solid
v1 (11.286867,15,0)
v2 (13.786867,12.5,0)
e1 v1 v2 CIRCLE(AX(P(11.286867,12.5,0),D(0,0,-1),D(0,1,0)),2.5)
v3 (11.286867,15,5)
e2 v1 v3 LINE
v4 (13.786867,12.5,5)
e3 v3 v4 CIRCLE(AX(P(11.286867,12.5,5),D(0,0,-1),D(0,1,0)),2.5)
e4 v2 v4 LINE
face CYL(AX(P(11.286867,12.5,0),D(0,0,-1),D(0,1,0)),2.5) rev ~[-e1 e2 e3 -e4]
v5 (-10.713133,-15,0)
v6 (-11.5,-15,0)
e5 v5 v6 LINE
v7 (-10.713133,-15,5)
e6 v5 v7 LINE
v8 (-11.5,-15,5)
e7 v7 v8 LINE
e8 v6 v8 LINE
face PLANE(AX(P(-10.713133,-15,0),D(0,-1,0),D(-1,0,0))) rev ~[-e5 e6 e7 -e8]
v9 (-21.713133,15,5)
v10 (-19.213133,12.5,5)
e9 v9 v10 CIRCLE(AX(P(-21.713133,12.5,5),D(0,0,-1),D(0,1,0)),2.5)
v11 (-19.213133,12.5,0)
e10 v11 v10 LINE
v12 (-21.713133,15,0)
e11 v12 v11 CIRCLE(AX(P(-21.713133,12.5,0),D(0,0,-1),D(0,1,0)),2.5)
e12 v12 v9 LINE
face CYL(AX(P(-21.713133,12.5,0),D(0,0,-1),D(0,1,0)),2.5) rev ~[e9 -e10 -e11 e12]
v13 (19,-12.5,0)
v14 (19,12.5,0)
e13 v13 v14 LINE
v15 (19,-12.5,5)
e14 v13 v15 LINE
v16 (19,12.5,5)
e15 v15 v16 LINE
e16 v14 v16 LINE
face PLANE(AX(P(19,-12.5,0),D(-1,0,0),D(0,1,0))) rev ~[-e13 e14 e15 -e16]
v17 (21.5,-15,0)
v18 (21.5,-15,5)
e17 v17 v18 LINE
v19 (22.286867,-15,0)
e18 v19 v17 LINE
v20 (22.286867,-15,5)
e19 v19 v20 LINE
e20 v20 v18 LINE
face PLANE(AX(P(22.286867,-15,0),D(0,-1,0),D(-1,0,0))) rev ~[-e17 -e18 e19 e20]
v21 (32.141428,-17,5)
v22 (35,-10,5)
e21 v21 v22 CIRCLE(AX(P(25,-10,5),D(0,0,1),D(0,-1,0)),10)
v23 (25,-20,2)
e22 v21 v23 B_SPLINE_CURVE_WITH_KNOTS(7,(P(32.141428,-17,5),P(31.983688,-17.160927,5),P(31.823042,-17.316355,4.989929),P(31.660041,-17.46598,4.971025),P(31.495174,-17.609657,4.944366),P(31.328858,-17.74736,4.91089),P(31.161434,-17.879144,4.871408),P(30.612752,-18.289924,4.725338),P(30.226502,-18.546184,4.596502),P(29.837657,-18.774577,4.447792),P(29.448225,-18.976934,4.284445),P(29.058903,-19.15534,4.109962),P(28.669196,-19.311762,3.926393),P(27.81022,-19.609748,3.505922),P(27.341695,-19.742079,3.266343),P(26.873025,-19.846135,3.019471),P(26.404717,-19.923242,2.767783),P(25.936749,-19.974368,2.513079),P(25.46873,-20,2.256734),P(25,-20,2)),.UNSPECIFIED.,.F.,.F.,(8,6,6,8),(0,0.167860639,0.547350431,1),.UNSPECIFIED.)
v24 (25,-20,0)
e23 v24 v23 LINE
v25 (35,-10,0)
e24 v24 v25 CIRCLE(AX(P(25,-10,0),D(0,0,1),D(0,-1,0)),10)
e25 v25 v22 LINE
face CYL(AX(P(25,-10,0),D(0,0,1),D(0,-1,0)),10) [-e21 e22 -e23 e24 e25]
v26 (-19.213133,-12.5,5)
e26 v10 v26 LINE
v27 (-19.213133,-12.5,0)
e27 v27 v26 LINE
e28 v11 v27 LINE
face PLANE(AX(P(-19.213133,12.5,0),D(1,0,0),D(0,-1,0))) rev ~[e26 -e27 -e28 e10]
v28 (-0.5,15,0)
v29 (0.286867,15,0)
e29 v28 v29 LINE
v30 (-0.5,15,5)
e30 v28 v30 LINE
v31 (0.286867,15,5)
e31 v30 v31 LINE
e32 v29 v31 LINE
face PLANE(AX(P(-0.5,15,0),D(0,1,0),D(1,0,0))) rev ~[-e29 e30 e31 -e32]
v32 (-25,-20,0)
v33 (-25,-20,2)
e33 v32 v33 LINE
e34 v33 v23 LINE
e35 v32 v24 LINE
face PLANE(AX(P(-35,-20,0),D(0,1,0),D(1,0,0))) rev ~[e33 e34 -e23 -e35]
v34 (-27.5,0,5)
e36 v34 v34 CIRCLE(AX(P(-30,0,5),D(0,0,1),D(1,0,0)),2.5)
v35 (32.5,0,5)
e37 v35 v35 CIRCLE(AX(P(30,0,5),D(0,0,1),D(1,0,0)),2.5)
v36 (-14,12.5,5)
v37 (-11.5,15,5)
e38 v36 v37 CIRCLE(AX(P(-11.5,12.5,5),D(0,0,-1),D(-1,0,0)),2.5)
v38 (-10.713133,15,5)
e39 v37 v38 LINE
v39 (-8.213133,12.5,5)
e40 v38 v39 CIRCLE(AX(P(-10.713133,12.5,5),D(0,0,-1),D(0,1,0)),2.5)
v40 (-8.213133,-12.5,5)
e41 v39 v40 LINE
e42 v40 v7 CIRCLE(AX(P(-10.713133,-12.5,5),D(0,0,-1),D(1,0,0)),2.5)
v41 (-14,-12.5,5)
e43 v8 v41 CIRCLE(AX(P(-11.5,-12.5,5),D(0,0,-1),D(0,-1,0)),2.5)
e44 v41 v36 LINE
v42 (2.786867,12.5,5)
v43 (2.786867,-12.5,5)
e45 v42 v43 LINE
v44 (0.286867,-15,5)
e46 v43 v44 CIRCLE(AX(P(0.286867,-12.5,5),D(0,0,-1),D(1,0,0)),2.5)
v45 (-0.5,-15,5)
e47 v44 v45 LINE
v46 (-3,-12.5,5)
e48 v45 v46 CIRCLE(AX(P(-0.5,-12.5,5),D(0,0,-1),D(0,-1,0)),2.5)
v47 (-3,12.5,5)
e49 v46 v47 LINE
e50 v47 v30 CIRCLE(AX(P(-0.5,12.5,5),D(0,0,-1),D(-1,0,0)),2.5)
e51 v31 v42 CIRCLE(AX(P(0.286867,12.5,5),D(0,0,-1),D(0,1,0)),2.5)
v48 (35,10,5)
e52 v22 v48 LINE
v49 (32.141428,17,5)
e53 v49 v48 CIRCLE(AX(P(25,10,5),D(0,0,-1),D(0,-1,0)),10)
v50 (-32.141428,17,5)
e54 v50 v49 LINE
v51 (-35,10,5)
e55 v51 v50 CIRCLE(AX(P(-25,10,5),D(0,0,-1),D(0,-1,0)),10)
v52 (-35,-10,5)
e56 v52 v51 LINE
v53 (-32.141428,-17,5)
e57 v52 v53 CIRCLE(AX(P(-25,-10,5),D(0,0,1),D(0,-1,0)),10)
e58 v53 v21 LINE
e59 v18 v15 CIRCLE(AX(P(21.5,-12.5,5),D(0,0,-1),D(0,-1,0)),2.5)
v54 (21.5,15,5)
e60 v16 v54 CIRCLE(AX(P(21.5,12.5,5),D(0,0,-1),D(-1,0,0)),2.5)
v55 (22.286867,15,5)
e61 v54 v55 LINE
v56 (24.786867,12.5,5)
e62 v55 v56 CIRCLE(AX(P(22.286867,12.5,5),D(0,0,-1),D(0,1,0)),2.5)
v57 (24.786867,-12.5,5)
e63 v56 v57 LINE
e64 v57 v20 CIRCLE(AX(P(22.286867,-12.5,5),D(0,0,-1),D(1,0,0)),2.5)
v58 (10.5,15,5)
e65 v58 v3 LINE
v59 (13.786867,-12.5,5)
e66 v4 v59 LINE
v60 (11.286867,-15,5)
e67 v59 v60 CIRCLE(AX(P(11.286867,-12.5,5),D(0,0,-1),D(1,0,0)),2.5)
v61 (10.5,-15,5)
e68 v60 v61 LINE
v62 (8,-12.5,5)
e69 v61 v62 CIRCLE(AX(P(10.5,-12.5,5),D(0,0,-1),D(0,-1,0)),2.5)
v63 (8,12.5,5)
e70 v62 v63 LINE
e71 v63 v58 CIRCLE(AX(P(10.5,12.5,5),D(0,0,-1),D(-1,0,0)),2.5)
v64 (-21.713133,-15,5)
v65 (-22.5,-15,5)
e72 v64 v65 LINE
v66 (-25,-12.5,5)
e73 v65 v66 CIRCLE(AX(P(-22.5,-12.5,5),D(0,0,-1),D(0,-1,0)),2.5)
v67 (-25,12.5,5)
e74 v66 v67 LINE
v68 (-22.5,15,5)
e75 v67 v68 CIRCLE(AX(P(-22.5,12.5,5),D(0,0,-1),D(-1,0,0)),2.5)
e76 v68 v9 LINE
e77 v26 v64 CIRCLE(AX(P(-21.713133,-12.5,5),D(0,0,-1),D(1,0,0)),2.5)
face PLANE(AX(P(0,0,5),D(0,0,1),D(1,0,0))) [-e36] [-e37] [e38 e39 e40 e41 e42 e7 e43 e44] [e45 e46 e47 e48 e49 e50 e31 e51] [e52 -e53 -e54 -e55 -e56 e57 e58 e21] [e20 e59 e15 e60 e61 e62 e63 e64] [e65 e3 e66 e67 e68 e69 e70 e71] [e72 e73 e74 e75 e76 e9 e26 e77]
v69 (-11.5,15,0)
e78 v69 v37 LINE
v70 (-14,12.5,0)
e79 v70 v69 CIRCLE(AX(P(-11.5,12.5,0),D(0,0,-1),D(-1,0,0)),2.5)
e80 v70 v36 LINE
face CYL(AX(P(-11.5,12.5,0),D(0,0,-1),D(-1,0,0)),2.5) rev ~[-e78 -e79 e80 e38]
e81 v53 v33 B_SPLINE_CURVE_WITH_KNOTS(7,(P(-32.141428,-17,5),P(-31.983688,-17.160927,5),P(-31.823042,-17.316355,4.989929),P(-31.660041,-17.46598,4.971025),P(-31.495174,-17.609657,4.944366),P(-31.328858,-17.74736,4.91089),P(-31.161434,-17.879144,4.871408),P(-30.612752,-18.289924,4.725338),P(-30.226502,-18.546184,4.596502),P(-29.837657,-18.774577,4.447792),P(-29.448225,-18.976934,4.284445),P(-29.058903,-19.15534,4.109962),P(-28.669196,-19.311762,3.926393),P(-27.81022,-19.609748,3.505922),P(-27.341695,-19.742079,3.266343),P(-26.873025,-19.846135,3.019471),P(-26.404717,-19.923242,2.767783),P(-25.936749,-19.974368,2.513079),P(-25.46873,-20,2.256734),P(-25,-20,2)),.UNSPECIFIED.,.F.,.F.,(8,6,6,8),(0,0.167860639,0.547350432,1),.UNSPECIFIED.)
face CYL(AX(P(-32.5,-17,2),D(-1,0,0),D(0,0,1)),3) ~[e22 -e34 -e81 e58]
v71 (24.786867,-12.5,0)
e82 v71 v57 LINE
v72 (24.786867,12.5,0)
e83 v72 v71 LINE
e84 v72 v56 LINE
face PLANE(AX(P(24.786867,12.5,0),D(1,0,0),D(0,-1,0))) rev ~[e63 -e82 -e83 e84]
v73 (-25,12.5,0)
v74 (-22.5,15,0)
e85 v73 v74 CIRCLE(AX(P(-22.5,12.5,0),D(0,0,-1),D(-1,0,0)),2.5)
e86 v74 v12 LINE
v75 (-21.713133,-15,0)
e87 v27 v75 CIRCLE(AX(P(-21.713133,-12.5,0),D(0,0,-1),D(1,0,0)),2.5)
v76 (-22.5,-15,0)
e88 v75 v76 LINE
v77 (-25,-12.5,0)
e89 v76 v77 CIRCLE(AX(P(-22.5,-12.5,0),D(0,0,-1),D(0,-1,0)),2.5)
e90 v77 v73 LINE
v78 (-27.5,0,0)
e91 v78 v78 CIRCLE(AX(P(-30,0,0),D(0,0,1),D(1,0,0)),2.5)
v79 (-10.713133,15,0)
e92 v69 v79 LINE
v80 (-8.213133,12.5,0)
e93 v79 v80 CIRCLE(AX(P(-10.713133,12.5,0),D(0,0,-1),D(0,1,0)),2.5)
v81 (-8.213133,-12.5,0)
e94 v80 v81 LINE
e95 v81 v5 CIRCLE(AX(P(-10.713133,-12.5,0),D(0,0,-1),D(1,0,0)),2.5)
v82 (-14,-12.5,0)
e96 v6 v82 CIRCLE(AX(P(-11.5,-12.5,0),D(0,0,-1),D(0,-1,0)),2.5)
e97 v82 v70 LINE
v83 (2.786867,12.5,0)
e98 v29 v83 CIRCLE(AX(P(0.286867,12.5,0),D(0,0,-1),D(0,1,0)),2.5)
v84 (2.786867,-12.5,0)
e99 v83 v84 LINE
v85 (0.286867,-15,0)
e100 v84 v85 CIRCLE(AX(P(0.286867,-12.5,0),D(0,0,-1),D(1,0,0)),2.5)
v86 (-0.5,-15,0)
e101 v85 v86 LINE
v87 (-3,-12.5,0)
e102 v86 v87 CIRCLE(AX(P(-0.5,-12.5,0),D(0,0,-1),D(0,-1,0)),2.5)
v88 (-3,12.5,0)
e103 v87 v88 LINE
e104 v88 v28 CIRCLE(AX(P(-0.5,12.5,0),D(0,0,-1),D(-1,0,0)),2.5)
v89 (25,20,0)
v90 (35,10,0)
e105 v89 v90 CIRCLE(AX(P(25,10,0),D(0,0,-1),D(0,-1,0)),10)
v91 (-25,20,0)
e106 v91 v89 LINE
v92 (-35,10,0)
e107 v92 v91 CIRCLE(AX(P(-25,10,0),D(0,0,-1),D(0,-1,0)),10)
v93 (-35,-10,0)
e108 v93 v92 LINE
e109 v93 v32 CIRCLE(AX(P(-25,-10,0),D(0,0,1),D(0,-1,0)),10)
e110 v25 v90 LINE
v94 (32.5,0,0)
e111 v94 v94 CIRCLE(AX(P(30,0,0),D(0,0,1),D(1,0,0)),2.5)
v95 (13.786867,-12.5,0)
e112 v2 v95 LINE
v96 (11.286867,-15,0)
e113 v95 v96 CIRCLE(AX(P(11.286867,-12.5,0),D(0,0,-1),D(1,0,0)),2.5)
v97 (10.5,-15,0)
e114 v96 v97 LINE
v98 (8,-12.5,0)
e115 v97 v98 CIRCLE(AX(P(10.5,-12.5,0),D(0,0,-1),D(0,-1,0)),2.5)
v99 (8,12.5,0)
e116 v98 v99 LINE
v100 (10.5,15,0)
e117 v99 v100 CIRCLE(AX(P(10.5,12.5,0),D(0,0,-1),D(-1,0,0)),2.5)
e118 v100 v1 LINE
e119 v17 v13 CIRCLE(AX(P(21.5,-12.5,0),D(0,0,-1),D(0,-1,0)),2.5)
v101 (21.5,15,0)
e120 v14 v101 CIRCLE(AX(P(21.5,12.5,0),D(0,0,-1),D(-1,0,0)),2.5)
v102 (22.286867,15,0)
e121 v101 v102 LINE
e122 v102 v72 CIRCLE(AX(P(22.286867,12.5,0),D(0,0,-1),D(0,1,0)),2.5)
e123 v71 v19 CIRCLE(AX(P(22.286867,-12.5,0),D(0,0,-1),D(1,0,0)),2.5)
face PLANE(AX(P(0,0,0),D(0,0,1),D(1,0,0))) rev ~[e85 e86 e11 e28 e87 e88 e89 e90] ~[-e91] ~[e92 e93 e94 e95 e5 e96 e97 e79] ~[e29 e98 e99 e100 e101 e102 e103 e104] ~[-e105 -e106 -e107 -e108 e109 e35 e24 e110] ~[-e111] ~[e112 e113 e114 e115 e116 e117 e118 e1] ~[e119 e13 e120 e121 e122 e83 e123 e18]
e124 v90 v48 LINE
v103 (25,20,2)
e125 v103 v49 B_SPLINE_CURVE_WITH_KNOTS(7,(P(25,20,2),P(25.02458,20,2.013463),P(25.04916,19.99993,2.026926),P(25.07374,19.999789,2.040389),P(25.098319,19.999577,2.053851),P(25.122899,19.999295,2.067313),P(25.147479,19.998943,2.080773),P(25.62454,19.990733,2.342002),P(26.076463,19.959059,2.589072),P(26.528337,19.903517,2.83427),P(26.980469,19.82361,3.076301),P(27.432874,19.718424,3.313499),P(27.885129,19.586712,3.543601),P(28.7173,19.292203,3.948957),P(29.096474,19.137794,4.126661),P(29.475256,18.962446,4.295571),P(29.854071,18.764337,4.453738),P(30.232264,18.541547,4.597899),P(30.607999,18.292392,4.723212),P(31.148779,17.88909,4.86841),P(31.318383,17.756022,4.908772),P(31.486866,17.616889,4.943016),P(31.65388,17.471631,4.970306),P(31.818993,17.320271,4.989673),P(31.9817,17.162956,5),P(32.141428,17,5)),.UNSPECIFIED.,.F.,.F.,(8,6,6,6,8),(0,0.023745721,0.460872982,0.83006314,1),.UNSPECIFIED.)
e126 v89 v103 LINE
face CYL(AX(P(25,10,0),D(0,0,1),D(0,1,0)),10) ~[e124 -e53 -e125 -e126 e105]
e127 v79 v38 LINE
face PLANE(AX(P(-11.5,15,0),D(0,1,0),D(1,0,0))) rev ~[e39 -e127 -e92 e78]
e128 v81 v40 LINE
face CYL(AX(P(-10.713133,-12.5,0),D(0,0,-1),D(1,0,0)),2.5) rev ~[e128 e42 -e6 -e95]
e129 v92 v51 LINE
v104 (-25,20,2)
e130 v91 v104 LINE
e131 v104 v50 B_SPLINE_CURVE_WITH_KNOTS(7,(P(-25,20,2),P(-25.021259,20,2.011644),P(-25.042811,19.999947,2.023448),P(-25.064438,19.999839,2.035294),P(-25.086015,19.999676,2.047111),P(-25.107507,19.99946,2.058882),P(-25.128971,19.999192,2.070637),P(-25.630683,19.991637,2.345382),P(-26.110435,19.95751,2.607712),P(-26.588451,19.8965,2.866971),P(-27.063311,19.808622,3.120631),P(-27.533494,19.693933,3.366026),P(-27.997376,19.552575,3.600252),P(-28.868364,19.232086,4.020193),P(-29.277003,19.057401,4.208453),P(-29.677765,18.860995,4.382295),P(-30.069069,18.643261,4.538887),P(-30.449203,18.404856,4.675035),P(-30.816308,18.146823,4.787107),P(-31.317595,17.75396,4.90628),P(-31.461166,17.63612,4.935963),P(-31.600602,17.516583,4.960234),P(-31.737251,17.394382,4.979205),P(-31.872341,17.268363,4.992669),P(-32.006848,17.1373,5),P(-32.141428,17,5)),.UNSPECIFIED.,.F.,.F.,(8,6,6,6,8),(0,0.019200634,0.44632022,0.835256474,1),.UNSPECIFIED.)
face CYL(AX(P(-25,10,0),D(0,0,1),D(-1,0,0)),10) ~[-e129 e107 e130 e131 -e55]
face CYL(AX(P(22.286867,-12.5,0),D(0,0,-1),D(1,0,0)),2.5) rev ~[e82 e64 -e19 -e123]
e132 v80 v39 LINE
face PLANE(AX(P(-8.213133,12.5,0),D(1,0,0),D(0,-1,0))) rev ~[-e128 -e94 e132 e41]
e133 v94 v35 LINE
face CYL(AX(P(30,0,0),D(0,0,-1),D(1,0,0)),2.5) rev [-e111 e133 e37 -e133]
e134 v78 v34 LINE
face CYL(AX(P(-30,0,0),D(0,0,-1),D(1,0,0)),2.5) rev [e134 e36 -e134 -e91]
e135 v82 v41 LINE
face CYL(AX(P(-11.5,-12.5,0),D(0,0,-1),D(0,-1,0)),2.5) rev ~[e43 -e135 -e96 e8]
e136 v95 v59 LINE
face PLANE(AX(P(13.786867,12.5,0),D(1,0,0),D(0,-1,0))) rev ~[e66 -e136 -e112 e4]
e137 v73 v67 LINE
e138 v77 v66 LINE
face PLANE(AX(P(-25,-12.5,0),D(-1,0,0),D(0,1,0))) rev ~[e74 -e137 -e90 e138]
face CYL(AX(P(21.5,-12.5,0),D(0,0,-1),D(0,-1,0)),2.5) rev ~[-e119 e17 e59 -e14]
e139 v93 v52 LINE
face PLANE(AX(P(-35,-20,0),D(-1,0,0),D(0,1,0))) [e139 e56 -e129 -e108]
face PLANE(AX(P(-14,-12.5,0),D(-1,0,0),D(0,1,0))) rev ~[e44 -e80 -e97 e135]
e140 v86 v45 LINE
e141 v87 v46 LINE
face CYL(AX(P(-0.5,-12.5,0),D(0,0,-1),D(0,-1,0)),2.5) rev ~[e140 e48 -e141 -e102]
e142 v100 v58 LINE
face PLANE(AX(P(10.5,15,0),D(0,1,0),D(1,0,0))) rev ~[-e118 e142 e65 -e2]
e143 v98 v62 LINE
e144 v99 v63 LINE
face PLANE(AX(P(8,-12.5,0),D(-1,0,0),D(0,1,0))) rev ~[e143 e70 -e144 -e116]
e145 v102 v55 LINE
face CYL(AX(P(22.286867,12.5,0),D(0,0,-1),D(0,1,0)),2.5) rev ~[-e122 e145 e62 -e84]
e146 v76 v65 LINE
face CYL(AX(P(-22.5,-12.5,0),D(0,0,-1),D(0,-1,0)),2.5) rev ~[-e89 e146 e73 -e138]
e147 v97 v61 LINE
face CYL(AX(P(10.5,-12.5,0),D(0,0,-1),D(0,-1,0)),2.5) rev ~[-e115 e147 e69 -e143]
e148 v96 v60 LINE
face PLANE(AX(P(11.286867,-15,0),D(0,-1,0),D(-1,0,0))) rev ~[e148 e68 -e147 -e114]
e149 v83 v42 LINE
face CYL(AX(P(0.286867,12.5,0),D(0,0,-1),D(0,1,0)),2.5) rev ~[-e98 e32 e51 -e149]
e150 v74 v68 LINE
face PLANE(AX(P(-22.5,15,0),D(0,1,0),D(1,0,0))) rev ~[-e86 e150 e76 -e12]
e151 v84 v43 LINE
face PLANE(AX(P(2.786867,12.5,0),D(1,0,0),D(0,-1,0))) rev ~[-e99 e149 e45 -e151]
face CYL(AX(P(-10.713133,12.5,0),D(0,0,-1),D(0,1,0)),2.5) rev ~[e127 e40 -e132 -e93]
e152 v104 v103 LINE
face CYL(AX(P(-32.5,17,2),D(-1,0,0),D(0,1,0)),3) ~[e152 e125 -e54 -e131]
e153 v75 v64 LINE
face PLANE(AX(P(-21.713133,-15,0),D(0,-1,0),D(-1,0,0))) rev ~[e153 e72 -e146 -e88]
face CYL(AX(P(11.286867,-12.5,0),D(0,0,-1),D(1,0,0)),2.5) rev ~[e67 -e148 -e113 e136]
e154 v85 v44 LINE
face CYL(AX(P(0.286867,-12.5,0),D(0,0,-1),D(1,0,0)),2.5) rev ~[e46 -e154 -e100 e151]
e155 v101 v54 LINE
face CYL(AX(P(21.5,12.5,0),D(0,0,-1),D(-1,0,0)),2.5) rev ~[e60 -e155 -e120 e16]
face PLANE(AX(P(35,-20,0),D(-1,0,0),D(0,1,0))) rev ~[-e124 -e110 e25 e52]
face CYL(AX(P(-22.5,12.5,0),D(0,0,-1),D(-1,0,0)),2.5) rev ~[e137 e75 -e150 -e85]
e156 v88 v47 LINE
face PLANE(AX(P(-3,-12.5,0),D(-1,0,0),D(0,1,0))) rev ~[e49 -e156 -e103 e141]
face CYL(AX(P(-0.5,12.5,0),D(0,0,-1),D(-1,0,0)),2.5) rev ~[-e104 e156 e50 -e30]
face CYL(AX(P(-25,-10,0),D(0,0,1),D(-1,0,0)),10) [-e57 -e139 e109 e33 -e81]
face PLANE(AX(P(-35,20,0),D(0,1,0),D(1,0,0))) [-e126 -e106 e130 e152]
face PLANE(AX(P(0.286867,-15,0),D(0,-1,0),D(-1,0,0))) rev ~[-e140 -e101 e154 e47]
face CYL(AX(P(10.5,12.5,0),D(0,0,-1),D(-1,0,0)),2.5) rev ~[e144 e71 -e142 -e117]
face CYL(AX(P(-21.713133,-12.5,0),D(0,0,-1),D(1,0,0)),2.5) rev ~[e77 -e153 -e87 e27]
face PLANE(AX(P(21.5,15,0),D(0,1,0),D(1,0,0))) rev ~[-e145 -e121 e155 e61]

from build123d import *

# Parameters (mm, degrees)
F0_W        = 70
F0_H        = 40
F0_R        = 2.5
F1_DEPTH    = 5
F2_R        = 10
F3_T1_DEPTH = 65


# Not quite as in the source:
# - a fillet or chamfer that OpenCascade refuses, or shapes differently, is made with other operations: its cross-section is extruded or revolved along the edge and cut away or added


with BuildPart() as f1:
    # F0 (on Top) → F1 (new body)
    with BuildSketch(Plane.XY):
        Rectangle(F0_W, F0_H)
        with Locations((-30, 0)):
            Circle(F0_R, mode=Mode.SUBTRACT)
        with BuildLine():
            ThreePointArc((-25, 12.5), (-24.267766953, 14.267766953), (-22.5, 15))
            Line((-22.5, 15), (-21.7131334842, 15))
            ThreePointArc((-21.7131334842, 15), (-19.9453665312, 14.267766953), (-19.2131334842, 12.5))
            Line((-19.2131334842, 12.5), (-19.2131334842, -12.5))
            ThreePointArc((-19.2131334842, -12.5), (-19.9453665312, -14.267766953), (-21.7131334842, -15))
            Line((-21.7131334842, -15), (-22.5, -15))
            ThreePointArc((-22.5, -15), (-24.267766953, -14.267766953), (-25, -12.5))
            Line((-25, -12.5), (-25, 12.5))
        make_face(mode=Mode.SUBTRACT)
        with BuildLine():
            Line((-14, -12.5), (-14, 12.5))
            ThreePointArc((-14, 12.5), (-13.267766953, 14.267766953), (-11.5, 15))
            Line((-11.5, 15), (-10.7131334842, 15))
            ThreePointArc((-10.7131334842, 15), (-8.9453665312, 14.267766953), (-8.2131334842, 12.5))
            Line((-8.2131334842, 12.5), (-8.2131334842, -12.5))
            ThreePointArc((-8.2131334842, -12.5), (-8.9453665312, -14.267766953), (-10.7131334842, -15))
            Line((-10.7131334842, -15), (-11.5, -15))
            ThreePointArc((-11.5, -15), (-13.267766953, -14.267766953), (-14, -12.5))
        make_face(mode=Mode.SUBTRACT)
        with BuildLine():
            Line((-3, -12.5), (-3, 12.5))
            ThreePointArc((-3, 12.5), (-2.267766953, 14.267766953), (-0.5, 15))
            Line((-0.5, 15), (0.2868665158, 15))
            ThreePointArc((0.2868665158, 15), (2.0546334688, 14.267766953), (2.7868665158, 12.5))
            Line((2.7868665158, 12.5), (2.7868665158, -12.5))
            ThreePointArc((2.7868665158, -12.5), (2.0546334688, -14.267766953), (0.2868665158, -15))
            Line((0.2868665158, -15), (-0.5, -15))
            ThreePointArc((-0.5, -15), (-2.267766953, -14.267766953), (-3, -12.5))
        make_face(mode=Mode.SUBTRACT)
        with BuildLine():
            Line((8, -12.5), (8, 12.5))
            ThreePointArc((8, 12.5), (8.732233047, 14.267766953), (10.5, 15))
            Line((10.5, 15), (11.2868665158, 15))
            ThreePointArc((11.2868665158, 15), (13.0546334688, 14.267766953), (13.7868665158, 12.5))
            Line((13.7868665158, 12.5), (13.7868665158, -12.5))
            ThreePointArc((13.7868665158, -12.5), (13.0546334688, -14.267766953), (11.2868665158, -15))
            Line((11.2868665158, -15), (10.5, -15))
            ThreePointArc((10.5, -15), (8.732233047, -14.267766953), (8, -12.5))
        make_face(mode=Mode.SUBTRACT)
        with BuildLine():
            Line((19, -12.5), (19, 12.5))
            ThreePointArc((19, 12.5), (19.732233047, 14.267766953), (21.5, 15))
            Line((21.5, 15), (22.2868665158, 15))
            ThreePointArc((22.2868665158, 15), (24.0546334688, 14.267766953), (24.7868665158, 12.5))
            Line((24.7868665158, 12.5), (24.7868665158, -12.5))
            ThreePointArc((24.7868665158, -12.5), (24.0546334688, -14.267766953), (22.2868665158, -15))
            Line((22.2868665158, -15), (21.5, -15))
            ThreePointArc((21.5, -15), (19.732233047, -14.267766953), (19, -12.5))
        make_face(mode=Mode.SUBTRACT)
        with Locations((30, 0)):
            Circle(F0_R, mode=Mode.SUBTRACT)
    extrude(amount=F1_DEPTH)

    # F2
    f2_edges = [f1.edges().sort_by_distance(p)[0] for p in [
        (-35, 20, 2.5),
        (-35, -20, 2.5),
        (35, -20, 2.5),
        (35, 20, 2.5),
    ]]
    fillet(f2_edges, radius=F2_R)

    # F3: fillet of radius 3 on 2 edges, made by hand

    # F3_s2 → F3_t1 (cut)
    with BuildSketch(Plane.YZ.offset(-32.5)):
        with BuildLine():
            ThreePointArc((-17, 5), (-19.1213203436, 4.1213203436), (-20, 2))
            Line((-20, 2), (-20, 5))
            Line((-20, 5), (-17, 5))
        make_face()
        with BuildLine():
            ThreePointArc((20, 2), (19.1213203436, 4.1213203436), (17, 5))
            Line((17, 5), (20, 5))
            Line((20, 5), (20, 2))
        make_face()
    extrude(amount=F3_T1_DEPTH, mode=Mode.SUBTRACT)


solid = f1.part
